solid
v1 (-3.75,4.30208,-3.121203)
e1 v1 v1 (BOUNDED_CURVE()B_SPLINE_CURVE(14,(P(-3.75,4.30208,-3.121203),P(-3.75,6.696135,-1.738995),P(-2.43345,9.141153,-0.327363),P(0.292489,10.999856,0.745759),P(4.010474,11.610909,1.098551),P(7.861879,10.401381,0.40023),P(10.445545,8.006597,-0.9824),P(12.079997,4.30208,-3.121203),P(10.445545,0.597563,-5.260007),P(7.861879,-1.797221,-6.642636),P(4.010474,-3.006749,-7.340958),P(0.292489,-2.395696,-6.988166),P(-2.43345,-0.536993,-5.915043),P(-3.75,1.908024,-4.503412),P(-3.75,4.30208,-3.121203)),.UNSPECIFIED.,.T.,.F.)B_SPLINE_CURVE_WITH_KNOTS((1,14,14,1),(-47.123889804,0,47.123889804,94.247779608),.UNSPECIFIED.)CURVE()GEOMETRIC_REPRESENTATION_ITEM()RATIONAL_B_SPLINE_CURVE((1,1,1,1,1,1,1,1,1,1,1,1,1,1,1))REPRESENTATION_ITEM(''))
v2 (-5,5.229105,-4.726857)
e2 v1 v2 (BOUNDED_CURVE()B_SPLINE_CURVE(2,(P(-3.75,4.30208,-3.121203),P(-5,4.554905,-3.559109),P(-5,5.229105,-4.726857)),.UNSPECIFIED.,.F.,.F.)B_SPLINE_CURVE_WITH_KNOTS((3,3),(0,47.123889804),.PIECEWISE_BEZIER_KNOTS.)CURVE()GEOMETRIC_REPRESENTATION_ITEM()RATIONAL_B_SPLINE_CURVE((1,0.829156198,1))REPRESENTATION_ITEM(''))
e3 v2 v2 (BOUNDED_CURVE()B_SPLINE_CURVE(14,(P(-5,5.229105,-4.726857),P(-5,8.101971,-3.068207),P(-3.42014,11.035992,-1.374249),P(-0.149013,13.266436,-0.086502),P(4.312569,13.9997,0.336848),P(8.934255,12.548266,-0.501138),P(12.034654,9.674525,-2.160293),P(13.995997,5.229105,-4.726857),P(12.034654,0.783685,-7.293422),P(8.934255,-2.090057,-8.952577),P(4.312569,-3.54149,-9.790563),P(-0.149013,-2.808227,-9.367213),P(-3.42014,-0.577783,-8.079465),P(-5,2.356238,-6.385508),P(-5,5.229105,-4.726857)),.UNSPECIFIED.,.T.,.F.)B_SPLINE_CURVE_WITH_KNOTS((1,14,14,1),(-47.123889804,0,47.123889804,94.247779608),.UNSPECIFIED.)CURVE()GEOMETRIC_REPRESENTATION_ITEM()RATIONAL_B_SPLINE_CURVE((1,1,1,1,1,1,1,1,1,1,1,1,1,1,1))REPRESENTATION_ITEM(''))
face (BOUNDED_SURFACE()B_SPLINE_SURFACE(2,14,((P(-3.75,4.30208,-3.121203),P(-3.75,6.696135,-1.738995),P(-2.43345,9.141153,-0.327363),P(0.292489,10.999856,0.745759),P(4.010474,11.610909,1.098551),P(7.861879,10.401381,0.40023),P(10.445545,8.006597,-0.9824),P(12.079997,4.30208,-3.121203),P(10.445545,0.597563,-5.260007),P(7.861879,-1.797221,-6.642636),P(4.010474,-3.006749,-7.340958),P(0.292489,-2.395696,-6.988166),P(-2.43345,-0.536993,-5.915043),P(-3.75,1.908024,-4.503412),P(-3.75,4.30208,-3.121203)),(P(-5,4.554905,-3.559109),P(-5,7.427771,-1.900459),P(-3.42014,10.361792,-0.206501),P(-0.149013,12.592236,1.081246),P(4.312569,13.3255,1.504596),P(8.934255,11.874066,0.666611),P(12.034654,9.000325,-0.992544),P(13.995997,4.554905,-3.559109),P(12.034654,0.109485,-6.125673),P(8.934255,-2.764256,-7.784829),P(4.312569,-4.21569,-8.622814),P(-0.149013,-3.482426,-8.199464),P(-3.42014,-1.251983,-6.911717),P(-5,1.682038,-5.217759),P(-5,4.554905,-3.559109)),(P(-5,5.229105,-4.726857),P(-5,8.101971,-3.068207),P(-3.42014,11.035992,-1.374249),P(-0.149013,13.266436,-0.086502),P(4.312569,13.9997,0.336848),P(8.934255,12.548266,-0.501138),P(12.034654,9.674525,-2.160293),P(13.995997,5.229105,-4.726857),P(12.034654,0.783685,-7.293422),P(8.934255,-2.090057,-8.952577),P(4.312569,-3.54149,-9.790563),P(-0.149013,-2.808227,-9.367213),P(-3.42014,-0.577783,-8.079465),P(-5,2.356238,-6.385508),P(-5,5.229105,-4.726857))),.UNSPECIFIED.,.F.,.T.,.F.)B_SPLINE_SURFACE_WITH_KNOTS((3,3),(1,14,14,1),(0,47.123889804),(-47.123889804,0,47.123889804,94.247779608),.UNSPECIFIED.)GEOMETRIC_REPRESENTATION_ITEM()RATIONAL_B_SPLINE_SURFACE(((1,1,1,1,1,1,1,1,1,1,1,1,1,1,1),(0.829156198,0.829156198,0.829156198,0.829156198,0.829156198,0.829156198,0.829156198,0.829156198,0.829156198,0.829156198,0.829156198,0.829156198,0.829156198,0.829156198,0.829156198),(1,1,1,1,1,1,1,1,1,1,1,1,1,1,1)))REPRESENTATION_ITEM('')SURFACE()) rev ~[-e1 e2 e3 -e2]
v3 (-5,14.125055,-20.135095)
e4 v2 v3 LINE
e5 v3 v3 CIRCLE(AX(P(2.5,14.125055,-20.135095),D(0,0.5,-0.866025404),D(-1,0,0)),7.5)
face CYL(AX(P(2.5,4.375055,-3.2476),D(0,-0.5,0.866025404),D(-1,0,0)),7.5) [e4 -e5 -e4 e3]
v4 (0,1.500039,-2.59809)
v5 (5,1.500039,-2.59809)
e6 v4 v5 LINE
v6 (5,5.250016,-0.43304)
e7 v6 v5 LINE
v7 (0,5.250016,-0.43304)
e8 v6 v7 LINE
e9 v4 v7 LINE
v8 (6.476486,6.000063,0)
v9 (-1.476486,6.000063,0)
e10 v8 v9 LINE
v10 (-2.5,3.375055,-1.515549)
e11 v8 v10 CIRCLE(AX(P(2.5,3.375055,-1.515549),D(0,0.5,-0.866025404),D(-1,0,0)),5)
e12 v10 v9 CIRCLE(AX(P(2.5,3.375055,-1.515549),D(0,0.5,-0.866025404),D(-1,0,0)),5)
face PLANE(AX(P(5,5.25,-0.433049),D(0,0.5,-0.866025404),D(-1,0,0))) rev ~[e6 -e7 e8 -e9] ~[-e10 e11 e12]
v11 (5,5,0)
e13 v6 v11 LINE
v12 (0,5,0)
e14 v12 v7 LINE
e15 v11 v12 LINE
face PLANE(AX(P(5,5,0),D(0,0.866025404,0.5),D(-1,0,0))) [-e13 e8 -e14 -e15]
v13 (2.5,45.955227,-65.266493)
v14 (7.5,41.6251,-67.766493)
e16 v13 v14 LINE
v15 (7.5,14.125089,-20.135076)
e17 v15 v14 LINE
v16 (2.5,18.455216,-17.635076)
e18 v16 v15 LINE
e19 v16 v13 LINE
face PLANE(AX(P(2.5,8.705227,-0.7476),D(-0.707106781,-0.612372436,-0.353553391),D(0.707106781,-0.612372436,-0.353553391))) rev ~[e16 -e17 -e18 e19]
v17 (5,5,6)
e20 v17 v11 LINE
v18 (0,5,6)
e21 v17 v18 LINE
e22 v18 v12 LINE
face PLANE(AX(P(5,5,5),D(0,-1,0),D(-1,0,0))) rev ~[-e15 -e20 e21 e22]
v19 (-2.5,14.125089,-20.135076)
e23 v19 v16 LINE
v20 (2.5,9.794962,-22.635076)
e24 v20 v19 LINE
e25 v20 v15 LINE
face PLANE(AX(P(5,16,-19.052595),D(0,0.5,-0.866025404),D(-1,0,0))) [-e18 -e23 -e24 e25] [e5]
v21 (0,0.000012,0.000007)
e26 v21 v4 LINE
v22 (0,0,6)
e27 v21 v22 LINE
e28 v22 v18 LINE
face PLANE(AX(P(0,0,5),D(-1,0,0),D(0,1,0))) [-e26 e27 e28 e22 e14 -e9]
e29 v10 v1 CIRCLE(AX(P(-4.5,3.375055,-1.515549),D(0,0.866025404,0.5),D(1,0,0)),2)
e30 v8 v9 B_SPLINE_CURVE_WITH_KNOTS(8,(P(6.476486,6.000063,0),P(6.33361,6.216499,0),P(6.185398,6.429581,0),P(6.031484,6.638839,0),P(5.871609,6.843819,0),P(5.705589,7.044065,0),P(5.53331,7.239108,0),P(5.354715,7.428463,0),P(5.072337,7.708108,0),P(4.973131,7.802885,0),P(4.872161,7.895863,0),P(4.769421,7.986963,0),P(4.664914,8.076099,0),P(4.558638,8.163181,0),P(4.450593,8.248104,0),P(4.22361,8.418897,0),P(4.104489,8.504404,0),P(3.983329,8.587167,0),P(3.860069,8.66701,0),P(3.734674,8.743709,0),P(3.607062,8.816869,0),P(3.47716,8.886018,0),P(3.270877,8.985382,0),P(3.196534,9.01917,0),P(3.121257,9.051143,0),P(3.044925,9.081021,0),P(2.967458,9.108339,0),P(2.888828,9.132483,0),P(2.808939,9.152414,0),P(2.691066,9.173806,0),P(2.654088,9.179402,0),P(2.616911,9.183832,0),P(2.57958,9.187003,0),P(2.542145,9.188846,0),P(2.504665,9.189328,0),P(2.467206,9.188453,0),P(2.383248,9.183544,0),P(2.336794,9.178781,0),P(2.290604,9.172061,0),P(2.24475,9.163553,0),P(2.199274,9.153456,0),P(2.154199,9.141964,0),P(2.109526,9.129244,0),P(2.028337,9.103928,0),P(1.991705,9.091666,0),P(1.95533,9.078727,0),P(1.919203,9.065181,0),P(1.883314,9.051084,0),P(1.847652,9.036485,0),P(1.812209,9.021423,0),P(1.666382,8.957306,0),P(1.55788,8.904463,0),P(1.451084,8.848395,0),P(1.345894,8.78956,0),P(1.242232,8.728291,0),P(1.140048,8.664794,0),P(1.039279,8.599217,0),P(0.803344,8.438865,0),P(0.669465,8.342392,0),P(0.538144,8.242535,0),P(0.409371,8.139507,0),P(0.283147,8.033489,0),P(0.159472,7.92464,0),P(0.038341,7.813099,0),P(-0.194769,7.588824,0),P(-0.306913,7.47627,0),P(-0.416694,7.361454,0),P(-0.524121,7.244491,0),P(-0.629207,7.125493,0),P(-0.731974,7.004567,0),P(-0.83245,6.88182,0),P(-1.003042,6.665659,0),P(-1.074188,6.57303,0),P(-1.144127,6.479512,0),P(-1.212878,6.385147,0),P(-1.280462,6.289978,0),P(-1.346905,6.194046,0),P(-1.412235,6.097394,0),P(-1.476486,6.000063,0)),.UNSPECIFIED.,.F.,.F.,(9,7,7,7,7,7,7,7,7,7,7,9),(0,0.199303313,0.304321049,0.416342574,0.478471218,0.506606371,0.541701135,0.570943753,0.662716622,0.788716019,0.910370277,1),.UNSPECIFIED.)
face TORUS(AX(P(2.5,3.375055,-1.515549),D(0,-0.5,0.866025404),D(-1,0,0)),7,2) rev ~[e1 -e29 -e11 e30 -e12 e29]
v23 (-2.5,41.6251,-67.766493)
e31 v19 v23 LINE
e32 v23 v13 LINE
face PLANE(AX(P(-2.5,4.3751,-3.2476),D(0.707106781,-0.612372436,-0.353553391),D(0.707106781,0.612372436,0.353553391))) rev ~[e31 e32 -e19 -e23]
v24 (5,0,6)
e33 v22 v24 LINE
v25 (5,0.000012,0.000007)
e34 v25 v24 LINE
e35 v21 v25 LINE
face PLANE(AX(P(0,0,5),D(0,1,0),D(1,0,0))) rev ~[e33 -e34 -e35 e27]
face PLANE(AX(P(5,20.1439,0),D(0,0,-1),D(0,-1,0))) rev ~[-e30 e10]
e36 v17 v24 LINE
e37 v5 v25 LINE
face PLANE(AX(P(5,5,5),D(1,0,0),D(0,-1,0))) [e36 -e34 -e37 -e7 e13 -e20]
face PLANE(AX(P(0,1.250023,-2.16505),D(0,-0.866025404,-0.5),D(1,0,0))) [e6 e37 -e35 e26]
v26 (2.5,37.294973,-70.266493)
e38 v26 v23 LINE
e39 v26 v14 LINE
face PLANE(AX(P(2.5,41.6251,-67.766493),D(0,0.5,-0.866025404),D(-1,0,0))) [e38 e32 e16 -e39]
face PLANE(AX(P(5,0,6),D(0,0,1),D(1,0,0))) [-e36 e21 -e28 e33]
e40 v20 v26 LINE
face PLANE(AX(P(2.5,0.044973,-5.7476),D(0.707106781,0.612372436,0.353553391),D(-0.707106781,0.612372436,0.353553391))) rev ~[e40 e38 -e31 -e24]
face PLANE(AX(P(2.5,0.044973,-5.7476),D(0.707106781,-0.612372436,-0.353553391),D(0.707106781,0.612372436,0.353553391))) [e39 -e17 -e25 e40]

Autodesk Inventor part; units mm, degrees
ref_plane "YZ Plane" through (0, 0, 0) normal (1, 0, 0) x (0, 1, 0)
sketch "Esquisse1" plane through (0, 0, 0) normal (0, 0, 1) x (1, 0, 0)
  line L0 (0, 0) -> (5, 0)
  line L1 (5, 0) -> (5, 5)
  line L2 (5, 5) -> (0, 5)
  line L3 (0, 5) -> (0, 0)
  dimension "d0" = 5
  dimension "d1" = 5
extrude "Extrusion1" add sketch "Esquisse1" along normal blind 5
ref_plane "Plan de construction1" through (0, 0, 5) normal (0, -0.5, 0.8660254) x (1, 0, 0)
sketch "Esquisse2" plane through (0, 0, 5) normal (0, -0.5, 0.8660254) x (1, 0, 0)
  line L0 (0, 4.3301) -> (5, 4.3301)
  line L1 (5, 0) -> (5, 4.3301) projected
  line L2 (0, 4.3301) -> (5, 4.3301)
  line L3 (5, 4.3301) -> (5, 0)
  line L4 (5, 0) -> (0, 0)
  line L5 (0, 0) -> (0, 4.3301)
  point P0 (0, -2.5)
extrude "Extrusion2" add sketch "Esquisse2" along normal mid plane 5
sketch "Esquisse3" plane through (0, -1.25, 7.1651) normal (0, -0.5, 0.8660254) x (1, 0, 0)
  line L0 (0, 0) -> (5, 0) projected
  line L1 (5, 0) -> (5, 4.3301) projected
  line L2 (5, 4.3301) -> (0, 4.3301) projected
  line L3 (0, 4.3301) -> (0, 0) projected
  point P0 (0, -2.5)
extrude "Extrusion3" add sketch "Esquisse3" along normal blind 5
fillet "Congé1" radius 2 2 edges at (2.5, 0, 13.6603) (2.5, -3.75, 11.4952)
ref_plane "Plan de construction2" through (5, 5, 0) normal (0, 0.5, -0.8660254) x (-1, 0, 0)
sketch "Esquisse4" plane through (5, 5, 0) normal (0, 0.5, -0.8660254) x (-1, 0, 0)
  line L0 (0, 0) -> (0, 2.5) projected
  line L1 (5, -4.3301) -> (5, -1.8301) projected
  line L2 (0, 0) -> (5, 0)
  line L3 (5, 0) -> (5, -4.3301)
  line L4 (5, -4.3301) -> (0, -4.3301)
  line L5 (0, -4.3301) -> (0, 0)
  point P0 (5, -1.8301)
extrude "Extrusion4" add sketch "Esquisse4" along normal mid plane 5
sketch "Esquisse6" plane through (5, 6.25, -2.1651) normal (0, 0.5, -0.8660254) x (-1, 0, 0)
  line L0 (0, 0) -> (5, 0) projected
  line L1 (5, 0) -> (2.5, 0)
  line L2 (2.5, 0) -> (2.5, -2.165)
  circle A0 centre (2.5, -2.165) radius 5
  point P0 (5, -4.3301)
  dimension "d14" = 2.165
  dimension "d15" = 10
extrude "Extrusion5" add sketch "Esquisse6" against normal blind 2
sketch "Esquisse7" plane through (5, 5, 5) normal (1, 0, 0) x (0, 0, -1)
  line L0 (5.433, 0.25) -> (5, 0) projected
  line L1 (5, 0) -> (-0.081, 0)
  line L2 (-0.081, 0) -> (-0.081, 15.1439)
  line L3 (-0.081, 15.1439) -> (5, 15.1439)
  line L4 (5, 15.1439) -> (5, 0)
  point P0 (5, -5)
extrude "Extrusion6" cut sketch "Esquisse7" along normal through all both and the other way through all
sketch "Esquisse8" plane through (2.5, 4.3751, -3.2476) normal (0, 0.5, -0.8660254) x (-1, 0, 0)
  arc A0 (3.9765, 3.031) -> (-3.9765, 3.031) centre (0, 0) ccw projected
  line L0 (0, 5) -> (-5, 0)
  arc A1 (-3.9765, 3.031) -> (3.9765, 3.031) centre (0, 0) ccw projected
  line L1 (0, -5) -> (-5, 0)
  line L2 (0, -5) -> (5, 0)
  line L3 (5, 0) -> (0, 5)
  point P0 (2.5, -2.1651)
extrude "Extrusion7" add sketch "Esquisse8" along normal blind 74.5 contours L3 L2 L1 L0
sketch "Esquisse9" plane through (5, 6.25, -2.1651) normal (0, 0.5, -0.8660254) x (-1, 0, 0)
  line L0 (7.5, -2.165) -> (2.5, 2.835) projected
  arc A0 (-1.4765, 0.866) -> (6.4765, 0.866) centre (2.5, -2.165) ccw projected
  arc A1 (6.4765, 0.866) -> (-1.4765, 0.866) centre (2.5, -2.165) ccw projected
  circle A2 centre (2.5, -2.165) radius 7.5
  point P0 (5, -4.3301)
  dimension "d24" = 15
extrude "Extrusion8" add sketch "Esquisse9" along normal blind 19.5 contours A0 A1 L0 | L0 A1 A0 | A2
fillet "Congé2" radius 2 1 edges at (7.5, 4.3751, -3.2476)
fillet "Congé3" radius 2 1 edges at (10, 4.3751, -3.2476)
sketch "Esquisse10" plane through (5, 5, 5) normal (1, 0, 0) x (0, 0, -1)
  line L0 (0, 0) -> (-6.9282, -4) projected
  line L1 (0, 0) -> (-8.5321, 0)
  line L2 (-8.5321, 0) -> (-8.5321, -9.6747)
  line L3 (-8.5321, -9.6747) -> (0, -9.6747)
  line L4 (0, -9.6747) -> (0, 0)
  point P0 (5, -5)
extrude "Extrusion9" cut sketch "Esquisse10" against normal through all
sketch "Esquisse11" plane through (5, 0, 5) normal (0, 0, 1) x (1, 0, 0)
  line L0 (-5, 0) -> (0, 0) projected
  line L1 (0, 5) -> (0, 0) projected
  line L2 (0, 5) -> (-5, 5) projected
  line L3 (-5, 0) -> (-5, 5) projected
  line L4 (-5, 0) -> (0, 0) projected
  line L5 (0, 5) -> (0, 0) projected
  line L6 (0, 5) -> (-5, 5) projected
  line L7 (-5, 0) -> (-5, 5) projected
extrude "Extrusion10" add sketch "Esquisse11" along normal blind 1
properties part number "Bras hélice"
